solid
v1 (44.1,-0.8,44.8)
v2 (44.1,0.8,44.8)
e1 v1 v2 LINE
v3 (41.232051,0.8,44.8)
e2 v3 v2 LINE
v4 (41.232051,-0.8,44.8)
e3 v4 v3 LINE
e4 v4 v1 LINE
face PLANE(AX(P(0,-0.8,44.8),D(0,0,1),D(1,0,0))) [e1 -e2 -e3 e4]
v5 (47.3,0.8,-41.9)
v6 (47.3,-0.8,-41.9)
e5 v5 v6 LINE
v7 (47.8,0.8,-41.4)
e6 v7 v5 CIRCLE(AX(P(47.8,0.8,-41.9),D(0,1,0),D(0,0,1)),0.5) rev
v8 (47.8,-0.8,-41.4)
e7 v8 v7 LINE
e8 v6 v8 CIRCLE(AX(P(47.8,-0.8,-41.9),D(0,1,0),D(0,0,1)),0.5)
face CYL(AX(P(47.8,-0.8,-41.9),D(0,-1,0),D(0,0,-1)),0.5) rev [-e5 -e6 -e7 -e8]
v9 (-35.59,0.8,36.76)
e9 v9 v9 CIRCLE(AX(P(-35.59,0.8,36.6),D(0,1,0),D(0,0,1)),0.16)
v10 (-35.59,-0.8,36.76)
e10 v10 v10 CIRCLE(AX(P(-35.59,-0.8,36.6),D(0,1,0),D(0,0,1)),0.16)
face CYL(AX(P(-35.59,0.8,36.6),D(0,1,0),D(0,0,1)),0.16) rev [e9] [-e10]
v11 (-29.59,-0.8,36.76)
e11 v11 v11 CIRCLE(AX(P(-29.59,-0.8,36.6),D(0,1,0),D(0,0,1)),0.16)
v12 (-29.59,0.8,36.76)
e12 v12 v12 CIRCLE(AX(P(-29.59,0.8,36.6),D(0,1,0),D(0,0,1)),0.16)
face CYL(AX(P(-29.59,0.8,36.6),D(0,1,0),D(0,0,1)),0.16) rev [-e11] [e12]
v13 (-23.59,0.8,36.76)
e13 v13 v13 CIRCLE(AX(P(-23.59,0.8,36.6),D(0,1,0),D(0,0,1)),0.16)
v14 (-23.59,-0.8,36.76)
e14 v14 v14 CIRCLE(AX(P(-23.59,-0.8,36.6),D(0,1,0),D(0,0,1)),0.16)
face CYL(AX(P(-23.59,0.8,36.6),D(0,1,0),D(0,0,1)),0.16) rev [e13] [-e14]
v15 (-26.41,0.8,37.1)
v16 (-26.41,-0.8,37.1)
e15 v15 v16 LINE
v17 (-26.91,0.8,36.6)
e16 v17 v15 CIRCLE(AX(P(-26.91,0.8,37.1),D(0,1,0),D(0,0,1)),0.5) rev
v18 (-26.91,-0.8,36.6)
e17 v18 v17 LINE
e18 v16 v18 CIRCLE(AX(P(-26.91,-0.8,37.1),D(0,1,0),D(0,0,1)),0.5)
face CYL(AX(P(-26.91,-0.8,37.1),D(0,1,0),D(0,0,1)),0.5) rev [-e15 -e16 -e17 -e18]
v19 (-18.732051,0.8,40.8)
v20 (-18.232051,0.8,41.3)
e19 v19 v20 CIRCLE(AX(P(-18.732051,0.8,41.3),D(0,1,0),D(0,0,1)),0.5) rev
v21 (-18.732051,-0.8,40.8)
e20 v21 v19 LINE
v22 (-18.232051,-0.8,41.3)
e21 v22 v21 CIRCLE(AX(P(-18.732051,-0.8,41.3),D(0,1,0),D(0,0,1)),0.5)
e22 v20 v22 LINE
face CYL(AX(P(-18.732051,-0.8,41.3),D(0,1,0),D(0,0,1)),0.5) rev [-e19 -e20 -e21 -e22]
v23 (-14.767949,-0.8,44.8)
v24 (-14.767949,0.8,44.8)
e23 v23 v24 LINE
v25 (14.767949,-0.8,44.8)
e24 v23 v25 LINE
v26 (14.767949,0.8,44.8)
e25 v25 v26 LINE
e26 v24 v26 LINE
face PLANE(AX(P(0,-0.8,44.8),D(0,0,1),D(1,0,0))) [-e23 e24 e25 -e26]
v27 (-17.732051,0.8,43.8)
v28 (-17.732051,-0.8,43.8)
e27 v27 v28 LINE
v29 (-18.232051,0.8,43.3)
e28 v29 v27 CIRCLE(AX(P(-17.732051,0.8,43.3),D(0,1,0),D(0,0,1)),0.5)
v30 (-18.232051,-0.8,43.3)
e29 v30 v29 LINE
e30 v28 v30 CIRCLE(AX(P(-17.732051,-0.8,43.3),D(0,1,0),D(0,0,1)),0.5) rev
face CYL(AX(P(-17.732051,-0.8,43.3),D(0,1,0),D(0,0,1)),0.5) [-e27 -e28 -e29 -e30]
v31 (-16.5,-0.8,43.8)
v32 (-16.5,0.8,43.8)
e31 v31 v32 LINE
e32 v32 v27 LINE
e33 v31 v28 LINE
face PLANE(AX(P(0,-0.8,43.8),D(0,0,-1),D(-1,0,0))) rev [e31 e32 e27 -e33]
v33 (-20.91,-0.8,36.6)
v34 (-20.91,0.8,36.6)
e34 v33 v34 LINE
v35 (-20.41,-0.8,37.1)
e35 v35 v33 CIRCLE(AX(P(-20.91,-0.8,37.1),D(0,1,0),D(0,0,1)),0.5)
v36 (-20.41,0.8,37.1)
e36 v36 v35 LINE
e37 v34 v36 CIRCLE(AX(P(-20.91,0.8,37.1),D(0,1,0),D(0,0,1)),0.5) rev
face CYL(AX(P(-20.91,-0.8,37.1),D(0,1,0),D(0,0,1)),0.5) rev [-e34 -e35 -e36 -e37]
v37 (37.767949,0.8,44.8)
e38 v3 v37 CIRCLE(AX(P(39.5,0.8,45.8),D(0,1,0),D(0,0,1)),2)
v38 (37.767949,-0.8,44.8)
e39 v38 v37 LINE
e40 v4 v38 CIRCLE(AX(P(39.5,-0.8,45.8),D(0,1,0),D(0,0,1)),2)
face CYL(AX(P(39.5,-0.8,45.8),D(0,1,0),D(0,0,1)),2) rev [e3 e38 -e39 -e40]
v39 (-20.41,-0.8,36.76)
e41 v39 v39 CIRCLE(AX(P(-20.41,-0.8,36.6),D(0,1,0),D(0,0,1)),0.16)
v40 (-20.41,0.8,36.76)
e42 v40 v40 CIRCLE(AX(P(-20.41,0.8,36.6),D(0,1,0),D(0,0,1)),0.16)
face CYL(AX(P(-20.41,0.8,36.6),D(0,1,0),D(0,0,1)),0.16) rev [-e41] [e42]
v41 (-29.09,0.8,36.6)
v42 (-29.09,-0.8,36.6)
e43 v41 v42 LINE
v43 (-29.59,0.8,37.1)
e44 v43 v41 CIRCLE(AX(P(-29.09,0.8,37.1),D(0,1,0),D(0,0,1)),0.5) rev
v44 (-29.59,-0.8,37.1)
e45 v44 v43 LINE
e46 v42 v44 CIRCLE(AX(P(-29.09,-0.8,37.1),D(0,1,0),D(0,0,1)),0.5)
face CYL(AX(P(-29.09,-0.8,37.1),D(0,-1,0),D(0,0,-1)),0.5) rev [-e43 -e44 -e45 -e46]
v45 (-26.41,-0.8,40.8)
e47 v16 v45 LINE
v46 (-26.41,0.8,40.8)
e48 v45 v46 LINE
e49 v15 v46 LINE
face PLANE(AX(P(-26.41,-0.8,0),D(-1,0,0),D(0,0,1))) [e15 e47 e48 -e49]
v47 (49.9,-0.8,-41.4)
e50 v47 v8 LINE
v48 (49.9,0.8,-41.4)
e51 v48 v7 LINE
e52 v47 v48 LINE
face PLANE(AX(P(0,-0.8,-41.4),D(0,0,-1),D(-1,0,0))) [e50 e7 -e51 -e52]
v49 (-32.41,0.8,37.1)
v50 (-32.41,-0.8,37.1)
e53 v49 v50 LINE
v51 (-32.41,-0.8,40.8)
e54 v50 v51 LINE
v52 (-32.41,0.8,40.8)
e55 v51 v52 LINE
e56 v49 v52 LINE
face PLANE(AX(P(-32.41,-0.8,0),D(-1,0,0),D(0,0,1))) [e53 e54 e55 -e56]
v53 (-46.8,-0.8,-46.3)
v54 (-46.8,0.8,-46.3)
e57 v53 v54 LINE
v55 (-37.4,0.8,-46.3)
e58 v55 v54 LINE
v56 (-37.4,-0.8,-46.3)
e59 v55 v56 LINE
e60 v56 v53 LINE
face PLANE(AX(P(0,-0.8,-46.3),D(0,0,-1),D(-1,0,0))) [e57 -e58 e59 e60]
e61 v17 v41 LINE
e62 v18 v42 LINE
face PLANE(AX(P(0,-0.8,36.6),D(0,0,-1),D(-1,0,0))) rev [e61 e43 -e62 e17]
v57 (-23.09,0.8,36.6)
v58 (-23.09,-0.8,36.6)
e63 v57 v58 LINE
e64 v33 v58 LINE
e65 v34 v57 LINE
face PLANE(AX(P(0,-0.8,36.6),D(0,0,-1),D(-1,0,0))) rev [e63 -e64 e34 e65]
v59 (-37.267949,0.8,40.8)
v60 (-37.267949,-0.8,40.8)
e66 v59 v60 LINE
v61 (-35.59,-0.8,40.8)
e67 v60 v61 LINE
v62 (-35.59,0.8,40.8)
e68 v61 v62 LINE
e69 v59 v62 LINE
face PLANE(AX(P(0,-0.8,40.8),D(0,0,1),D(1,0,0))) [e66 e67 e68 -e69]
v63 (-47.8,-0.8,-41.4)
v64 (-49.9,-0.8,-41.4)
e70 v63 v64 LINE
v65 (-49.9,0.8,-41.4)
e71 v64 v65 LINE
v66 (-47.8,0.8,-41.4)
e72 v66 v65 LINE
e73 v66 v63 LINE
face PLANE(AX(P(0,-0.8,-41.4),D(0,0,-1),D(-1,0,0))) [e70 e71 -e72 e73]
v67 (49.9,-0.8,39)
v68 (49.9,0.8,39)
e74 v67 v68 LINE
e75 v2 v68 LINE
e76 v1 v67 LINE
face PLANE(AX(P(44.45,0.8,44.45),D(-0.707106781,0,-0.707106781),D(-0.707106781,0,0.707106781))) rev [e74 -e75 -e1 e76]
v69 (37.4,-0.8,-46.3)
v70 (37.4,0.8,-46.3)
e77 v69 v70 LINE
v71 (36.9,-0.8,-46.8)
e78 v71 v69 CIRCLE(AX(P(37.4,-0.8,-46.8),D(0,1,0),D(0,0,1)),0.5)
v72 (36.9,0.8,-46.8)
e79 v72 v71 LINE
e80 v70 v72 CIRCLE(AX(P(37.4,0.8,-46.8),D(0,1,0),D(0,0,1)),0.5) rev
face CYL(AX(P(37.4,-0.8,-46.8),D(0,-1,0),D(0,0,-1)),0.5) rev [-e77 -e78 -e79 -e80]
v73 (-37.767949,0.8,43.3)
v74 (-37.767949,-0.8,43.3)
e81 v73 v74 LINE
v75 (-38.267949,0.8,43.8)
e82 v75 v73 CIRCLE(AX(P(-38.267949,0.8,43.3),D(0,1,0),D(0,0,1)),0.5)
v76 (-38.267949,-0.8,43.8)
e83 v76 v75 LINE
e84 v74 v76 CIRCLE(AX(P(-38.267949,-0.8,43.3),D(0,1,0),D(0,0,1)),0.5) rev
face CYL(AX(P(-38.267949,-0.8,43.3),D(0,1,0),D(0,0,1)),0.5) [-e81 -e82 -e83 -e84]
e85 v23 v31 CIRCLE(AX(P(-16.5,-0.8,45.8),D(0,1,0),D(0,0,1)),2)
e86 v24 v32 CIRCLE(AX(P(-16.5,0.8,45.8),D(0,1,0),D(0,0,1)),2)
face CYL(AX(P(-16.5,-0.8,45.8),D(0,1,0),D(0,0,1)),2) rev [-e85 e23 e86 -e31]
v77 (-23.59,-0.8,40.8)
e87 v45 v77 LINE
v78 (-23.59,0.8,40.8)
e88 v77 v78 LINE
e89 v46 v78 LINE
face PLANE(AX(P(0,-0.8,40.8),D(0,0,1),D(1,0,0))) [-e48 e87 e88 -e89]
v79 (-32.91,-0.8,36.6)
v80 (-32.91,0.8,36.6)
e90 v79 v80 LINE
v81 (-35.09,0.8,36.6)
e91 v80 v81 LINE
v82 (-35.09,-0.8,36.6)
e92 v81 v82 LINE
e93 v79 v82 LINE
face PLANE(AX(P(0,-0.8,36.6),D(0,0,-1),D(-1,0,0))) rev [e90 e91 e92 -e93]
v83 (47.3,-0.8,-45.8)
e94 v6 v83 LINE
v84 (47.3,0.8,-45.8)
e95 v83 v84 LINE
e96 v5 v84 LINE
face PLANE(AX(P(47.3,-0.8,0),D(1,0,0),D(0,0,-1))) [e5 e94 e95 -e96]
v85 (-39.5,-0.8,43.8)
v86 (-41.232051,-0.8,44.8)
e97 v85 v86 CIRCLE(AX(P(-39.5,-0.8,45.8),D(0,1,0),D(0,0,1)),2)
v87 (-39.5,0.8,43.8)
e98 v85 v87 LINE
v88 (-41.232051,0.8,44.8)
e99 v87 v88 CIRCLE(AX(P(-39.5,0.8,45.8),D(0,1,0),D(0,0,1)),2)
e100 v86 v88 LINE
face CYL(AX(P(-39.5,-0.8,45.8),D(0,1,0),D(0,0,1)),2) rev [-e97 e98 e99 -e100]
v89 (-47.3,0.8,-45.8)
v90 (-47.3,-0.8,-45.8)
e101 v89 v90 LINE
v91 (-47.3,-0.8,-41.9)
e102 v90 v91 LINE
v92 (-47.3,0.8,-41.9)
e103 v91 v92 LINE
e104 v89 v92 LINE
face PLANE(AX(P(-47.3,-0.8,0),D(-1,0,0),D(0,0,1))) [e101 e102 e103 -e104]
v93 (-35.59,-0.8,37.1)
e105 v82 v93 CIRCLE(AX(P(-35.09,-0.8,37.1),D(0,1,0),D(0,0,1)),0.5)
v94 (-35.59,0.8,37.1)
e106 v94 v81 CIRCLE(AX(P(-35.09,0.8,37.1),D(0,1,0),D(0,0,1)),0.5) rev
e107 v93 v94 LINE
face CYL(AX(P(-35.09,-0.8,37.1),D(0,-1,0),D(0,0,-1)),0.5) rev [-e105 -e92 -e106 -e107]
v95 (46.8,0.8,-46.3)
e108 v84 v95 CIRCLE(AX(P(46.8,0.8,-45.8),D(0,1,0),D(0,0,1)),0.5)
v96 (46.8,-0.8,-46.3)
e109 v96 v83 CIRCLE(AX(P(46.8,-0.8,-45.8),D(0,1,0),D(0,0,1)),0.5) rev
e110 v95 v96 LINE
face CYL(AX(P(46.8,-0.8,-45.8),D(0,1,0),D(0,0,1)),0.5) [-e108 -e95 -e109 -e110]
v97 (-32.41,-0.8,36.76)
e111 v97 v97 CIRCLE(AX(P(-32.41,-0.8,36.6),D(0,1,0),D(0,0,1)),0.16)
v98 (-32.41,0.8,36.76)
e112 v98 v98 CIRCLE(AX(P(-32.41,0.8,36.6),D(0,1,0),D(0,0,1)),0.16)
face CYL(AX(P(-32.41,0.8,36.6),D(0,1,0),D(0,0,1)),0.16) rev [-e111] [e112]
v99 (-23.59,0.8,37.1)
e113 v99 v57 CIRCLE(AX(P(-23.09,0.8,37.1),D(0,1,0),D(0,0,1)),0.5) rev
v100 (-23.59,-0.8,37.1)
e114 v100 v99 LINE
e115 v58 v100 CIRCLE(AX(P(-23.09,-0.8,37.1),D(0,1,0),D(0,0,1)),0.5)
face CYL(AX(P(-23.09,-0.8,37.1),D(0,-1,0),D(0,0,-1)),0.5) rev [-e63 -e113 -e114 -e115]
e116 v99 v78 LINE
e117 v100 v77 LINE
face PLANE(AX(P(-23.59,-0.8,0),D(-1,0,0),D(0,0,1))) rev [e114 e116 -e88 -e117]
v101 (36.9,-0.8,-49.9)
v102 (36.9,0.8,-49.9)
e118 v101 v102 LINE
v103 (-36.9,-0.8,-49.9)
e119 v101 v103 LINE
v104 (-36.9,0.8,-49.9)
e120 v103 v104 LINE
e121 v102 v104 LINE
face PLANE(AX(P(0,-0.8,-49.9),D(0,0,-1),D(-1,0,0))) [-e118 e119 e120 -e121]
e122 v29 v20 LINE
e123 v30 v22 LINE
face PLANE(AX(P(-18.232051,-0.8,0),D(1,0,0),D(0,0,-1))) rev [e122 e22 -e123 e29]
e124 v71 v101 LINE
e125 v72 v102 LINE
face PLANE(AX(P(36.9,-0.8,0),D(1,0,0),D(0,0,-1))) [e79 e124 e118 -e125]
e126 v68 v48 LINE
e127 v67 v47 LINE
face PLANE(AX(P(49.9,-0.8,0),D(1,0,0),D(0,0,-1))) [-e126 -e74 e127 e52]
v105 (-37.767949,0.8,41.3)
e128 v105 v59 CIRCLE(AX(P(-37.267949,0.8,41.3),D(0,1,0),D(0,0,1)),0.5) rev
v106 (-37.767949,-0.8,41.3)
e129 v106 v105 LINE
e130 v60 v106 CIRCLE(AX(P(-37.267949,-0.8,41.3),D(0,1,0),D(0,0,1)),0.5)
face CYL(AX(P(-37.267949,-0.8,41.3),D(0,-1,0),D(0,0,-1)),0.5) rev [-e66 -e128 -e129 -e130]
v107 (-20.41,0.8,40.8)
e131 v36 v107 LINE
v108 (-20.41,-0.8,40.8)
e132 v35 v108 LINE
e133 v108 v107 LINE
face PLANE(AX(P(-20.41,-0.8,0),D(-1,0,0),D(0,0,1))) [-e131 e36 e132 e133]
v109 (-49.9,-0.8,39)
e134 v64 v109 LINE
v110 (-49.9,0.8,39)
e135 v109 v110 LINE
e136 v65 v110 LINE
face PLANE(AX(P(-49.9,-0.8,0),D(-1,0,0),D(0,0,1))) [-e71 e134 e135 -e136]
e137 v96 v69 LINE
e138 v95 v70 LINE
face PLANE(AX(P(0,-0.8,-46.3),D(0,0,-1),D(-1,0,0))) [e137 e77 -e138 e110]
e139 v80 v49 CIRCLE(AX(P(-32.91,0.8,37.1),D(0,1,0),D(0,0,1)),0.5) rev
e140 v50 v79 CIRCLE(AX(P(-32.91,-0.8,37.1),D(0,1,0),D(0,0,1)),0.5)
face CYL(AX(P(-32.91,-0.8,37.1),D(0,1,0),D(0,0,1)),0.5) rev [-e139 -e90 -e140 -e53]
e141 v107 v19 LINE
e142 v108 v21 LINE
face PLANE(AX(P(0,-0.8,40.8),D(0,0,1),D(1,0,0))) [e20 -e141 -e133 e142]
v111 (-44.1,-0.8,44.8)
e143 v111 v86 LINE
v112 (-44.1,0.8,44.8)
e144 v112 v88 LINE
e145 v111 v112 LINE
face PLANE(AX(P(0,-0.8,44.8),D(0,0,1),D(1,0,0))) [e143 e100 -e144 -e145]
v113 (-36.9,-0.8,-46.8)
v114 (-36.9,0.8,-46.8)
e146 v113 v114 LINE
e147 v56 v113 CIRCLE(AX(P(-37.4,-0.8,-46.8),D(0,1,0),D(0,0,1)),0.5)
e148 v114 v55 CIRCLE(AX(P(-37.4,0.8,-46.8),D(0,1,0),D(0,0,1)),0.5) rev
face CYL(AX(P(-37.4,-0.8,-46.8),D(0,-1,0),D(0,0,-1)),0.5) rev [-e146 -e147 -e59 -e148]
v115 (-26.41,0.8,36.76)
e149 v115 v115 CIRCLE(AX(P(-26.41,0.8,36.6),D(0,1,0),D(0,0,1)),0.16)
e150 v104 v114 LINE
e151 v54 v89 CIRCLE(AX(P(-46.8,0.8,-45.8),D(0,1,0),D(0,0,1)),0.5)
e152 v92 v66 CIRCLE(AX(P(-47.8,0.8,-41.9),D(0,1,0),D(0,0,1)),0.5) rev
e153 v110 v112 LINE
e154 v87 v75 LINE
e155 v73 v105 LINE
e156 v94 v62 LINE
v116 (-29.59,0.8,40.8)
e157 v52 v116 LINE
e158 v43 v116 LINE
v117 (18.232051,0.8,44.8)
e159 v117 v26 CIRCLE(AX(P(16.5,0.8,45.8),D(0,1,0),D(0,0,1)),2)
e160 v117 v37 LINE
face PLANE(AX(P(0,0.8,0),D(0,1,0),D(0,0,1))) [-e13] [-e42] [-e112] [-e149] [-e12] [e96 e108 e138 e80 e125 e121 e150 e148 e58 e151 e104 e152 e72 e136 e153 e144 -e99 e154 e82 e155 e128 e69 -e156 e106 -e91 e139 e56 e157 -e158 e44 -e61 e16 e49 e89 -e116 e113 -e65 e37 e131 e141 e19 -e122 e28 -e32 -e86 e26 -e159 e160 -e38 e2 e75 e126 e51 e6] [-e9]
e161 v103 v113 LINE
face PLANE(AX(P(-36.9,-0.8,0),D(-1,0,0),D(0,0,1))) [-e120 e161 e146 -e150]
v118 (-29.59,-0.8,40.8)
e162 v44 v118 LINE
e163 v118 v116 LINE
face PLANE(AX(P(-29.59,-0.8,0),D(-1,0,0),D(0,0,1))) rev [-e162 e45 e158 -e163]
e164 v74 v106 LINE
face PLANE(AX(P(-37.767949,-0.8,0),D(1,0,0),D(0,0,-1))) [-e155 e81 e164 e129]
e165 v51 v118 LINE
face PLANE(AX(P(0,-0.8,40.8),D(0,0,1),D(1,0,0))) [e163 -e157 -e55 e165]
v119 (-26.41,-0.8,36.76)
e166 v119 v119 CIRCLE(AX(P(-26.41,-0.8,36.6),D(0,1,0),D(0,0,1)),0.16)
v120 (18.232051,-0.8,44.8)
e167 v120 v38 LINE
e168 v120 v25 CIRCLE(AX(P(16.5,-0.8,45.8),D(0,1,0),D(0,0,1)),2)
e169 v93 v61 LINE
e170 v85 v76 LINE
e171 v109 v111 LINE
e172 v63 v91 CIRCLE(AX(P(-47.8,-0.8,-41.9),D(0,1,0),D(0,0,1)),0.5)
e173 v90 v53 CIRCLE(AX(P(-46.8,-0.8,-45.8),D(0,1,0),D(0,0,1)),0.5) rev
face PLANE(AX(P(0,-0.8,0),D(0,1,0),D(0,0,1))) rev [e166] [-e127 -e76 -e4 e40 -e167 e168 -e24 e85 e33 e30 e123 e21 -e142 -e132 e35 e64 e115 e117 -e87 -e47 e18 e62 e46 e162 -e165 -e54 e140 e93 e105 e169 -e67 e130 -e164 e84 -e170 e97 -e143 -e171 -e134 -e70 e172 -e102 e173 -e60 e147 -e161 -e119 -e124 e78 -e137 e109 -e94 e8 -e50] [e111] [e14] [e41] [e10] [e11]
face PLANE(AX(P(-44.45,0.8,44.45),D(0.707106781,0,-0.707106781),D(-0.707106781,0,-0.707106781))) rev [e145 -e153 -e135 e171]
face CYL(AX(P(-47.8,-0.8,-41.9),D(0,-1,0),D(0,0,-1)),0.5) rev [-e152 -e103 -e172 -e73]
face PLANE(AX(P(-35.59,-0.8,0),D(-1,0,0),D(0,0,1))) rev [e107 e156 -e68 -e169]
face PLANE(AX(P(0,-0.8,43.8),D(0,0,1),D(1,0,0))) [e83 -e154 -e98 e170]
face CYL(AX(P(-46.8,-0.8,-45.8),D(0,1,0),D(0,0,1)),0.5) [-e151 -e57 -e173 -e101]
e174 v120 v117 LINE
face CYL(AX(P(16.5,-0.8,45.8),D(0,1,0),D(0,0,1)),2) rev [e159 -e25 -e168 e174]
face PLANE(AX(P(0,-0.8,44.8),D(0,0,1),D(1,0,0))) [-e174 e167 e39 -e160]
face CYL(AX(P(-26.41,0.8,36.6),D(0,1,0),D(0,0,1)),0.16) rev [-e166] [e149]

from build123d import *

# Parameters (mm, degrees)
GENERALSHAPE_DEPTH           = 0.8
ADDTOLERANCE_START           = -0.8
ADDTOLERANCE_DEPTH           = 1.6
BACKPLANE_DEPTH              = 71.573791169
BACKPLANE_DEPTH_BACK         = 71.573791169
RF_W                         = 3.18
RF_H                         = 4.2
CUT_EXTRUDE1_DEPTH           = 71.587392642
FILLET1_R                    = 0.5
F_0_32_0_32_DIAMETER_HOLE1_D = 0.32
FILLET2_R                    = 0.5


# Read off the part's stored shape, not the designer's step: AddTolerance
with BuildPart() as part:
    # Sketch2 → GeneralShape (new, symmetric)
    with BuildSketch(Plane(origin=(0, 0, 0), x_dir=(1, 0, 0), z_dir=(0, 1, 0))):
        Polygon((47.4, 46.4), (37, 46.4), (37, 50), (-37, 50), (-37, 46.4), (-47.4, 46.4), (-47.4, 41.5), (-50, 41.5), (-50, -38.9), (-41.5, -47.4), (41.5, -47.4), (50, -38.9), (50, 41.5), (47.4, 41.5), align=None)
    extrude(amount=GENERALSHAPE_DEPTH, both=True)

    # AddTolerance outline → AddTolerance (cut)
    with BuildSketch(Plane(origin=(0, 0, 0), x_dir=(1, 0, 0), z_dir=(0, 1, 0)).offset(ADDTOLERANCE_START)):
        Polygon((49.9, 41.4), (49.9, -39), (50, -38.9), (50, 41.5), (47.4, 41.5), (47.4, 46.4), (37, 46.4), (37, 50), (-37, 50), (-37, 46.4), (-47.4, 46.4), (-47.4, 41.5), (-50, 41.5), (-50, -38.9), (-49.9, -39), (-49.9, 41.4), (-47.3, 41.4), (-47.3, 46.3), (-36.9, 46.3), (-36.9, 49.9), (36.9, 49.9), (36.9, 46.3), (47.3, 46.3), (47.3, 41.4), align=None)
    extrude(amount=ADDTOLERANCE_DEPTH, mode=Mode.SUBTRACT)

    # Sketch4 → Backplane (cut, two sides: drawn at the far end of the back side and taken through both)
    with BuildSketch(Plane(origin=(0, 0, 0), x_dir=(1, 0, 0), z_dir=(0, 1, 0)).offset(-BACKPLANE_DEPTH_BACK)):
        with BuildLine():
            Line((41.5, -47.4), (44.1, -44.8))
            Line((44.1, -44.8), (41.232050808, -44.8))
            ThreePointArc((41.232050808, -44.8), (39.5, -43.8), (37.767949192, -44.8))
            Line((37.767949192, -44.8), (18.232050808, -44.8))
            ThreePointArc((18.232050808, -44.8), (16.5, -43.8), (14.767949192, -44.8))
            Line((14.767949192, -44.8), (-14.767949192, -44.8))
            ThreePointArc((-14.767949192, -44.8), (-16.5, -43.8), (-18.232050808, -44.8))
            Line((-18.232050808, -44.8), (-37.767949192, -44.8))
            ThreePointArc((-37.767949192, -44.8), (-39.5, -43.8), (-41.232050808, -44.8))
            Line((-41.232050808, -44.8), (-44.1, -44.8))
            Line((-44.1, -44.8), (-41.5, -47.4))
            Line((-41.5, -47.4), (41.5, -47.4))
        make_face()
    extrude(amount=BACKPLANE_DEPTH + BACKPLANE_DEPTH_BACK, mode=Mode.SUBTRACT)

    # RF → Cut-Extrude1 (cut, through all)
    with BuildSketch(Plane(origin=(0, 0.8, 0), x_dir=(1, 0, 0), z_dir=(0, 1, 0))):
        with Locations((-22, -38.7)):
            Rectangle(RF_W, RF_H)
        with Locations((-28, -38.7)):
            Rectangle(RF_W, RF_H)
        with Locations((-34, -38.7)):
            Rectangle(RF_W, RF_H)
        with BuildLine():
            Line((-18.232050808, -40.8), (-20.41, -40.8))
            Line((-20.41, -40.8), (-23.59, -40.8))
            Line((-23.59, -40.8), (-26.41, -40.8))
            Line((-26.41, -40.8), (-29.59, -40.8))
            Line((-29.59, -40.8), (-32.41, -40.8))
            Line((-32.41, -40.8), (-35.59, -40.8))
            Line((-35.59, -40.8), (-37.767949192, -40.8))
            Line((-37.767949192, -40.8), (-37.767949192, -43.8))
            Line((-37.767949192, -43.8), (-39.5, -43.8))
            ThreePointArc((-39.5, -43.8), (-38.5, -44.067949192), (-37.767949192, -44.8))
            Line((-37.767949192, -44.8), (-18.232050808, -44.8))
            ThreePointArc((-18.232050808, -44.8), (-17.5, -44.067949192), (-16.5, -43.8))
            Line((-16.5, -43.8), (-18.232050808, -43.8))
            Line((-18.232050808, -43.8), (-18.232050808, -40.8))
        make_face()
    extrude(amount=-CUT_EXTRUDE1_DEPTH, mode=Mode.SUBTRACT)

    # Fillet1
    fillet1_edges = [part.edges().sort_by_distance(p)[0] for p in [
        (-23.59, 0, 36.6),
        (-20.41, 0, 36.6),
        (-18.232050808, 0, 40.8),
        (-18.232050808, 0, 43.8),
        (-37.767949192, 0, 43.8),
        (-37.767949192, 0, 40.8),
        (-35.59, 0, 36.6),
        (-32.41, 0, 36.6),
        (-29.59, 0, 36.6),
        (-26.41, 0, 36.6),
    ]]
    fillet(fillet1_edges, radius=FILLET1_R)

    # Ø0.32 (0.32) Diameter Hole1 (through all)
    with Locations(Plane(origin=(0, 0.8, 0), x_dir=(1, 0, 0), z_dir=(0, 1, 0))):
        with Locations((-20.41, -36.6), (-23.59, -36.6), (-26.41, -36.6), (-29.59, -36.6), (-32.41, -36.6), (-35.59, -36.6)):
            Hole(F_0_32_0_32_DIAMETER_HOLE1_D / 2)

    # Fillet2
    fillet2_edges = [part.edges().sort_by_distance(p)[0] for p in [
        (47.3, 0, -41.4),
        (47.3, 0, -46.3),
        (36.9, 0, -46.3),
        (-36.9, 0, -46.3),
        (-47.3, 0, -46.3),
        (-47.3, 0, -41.4),
    ]]
    fillet(fillet2_edges, radius=FILLET2_R)


solid = part.part
